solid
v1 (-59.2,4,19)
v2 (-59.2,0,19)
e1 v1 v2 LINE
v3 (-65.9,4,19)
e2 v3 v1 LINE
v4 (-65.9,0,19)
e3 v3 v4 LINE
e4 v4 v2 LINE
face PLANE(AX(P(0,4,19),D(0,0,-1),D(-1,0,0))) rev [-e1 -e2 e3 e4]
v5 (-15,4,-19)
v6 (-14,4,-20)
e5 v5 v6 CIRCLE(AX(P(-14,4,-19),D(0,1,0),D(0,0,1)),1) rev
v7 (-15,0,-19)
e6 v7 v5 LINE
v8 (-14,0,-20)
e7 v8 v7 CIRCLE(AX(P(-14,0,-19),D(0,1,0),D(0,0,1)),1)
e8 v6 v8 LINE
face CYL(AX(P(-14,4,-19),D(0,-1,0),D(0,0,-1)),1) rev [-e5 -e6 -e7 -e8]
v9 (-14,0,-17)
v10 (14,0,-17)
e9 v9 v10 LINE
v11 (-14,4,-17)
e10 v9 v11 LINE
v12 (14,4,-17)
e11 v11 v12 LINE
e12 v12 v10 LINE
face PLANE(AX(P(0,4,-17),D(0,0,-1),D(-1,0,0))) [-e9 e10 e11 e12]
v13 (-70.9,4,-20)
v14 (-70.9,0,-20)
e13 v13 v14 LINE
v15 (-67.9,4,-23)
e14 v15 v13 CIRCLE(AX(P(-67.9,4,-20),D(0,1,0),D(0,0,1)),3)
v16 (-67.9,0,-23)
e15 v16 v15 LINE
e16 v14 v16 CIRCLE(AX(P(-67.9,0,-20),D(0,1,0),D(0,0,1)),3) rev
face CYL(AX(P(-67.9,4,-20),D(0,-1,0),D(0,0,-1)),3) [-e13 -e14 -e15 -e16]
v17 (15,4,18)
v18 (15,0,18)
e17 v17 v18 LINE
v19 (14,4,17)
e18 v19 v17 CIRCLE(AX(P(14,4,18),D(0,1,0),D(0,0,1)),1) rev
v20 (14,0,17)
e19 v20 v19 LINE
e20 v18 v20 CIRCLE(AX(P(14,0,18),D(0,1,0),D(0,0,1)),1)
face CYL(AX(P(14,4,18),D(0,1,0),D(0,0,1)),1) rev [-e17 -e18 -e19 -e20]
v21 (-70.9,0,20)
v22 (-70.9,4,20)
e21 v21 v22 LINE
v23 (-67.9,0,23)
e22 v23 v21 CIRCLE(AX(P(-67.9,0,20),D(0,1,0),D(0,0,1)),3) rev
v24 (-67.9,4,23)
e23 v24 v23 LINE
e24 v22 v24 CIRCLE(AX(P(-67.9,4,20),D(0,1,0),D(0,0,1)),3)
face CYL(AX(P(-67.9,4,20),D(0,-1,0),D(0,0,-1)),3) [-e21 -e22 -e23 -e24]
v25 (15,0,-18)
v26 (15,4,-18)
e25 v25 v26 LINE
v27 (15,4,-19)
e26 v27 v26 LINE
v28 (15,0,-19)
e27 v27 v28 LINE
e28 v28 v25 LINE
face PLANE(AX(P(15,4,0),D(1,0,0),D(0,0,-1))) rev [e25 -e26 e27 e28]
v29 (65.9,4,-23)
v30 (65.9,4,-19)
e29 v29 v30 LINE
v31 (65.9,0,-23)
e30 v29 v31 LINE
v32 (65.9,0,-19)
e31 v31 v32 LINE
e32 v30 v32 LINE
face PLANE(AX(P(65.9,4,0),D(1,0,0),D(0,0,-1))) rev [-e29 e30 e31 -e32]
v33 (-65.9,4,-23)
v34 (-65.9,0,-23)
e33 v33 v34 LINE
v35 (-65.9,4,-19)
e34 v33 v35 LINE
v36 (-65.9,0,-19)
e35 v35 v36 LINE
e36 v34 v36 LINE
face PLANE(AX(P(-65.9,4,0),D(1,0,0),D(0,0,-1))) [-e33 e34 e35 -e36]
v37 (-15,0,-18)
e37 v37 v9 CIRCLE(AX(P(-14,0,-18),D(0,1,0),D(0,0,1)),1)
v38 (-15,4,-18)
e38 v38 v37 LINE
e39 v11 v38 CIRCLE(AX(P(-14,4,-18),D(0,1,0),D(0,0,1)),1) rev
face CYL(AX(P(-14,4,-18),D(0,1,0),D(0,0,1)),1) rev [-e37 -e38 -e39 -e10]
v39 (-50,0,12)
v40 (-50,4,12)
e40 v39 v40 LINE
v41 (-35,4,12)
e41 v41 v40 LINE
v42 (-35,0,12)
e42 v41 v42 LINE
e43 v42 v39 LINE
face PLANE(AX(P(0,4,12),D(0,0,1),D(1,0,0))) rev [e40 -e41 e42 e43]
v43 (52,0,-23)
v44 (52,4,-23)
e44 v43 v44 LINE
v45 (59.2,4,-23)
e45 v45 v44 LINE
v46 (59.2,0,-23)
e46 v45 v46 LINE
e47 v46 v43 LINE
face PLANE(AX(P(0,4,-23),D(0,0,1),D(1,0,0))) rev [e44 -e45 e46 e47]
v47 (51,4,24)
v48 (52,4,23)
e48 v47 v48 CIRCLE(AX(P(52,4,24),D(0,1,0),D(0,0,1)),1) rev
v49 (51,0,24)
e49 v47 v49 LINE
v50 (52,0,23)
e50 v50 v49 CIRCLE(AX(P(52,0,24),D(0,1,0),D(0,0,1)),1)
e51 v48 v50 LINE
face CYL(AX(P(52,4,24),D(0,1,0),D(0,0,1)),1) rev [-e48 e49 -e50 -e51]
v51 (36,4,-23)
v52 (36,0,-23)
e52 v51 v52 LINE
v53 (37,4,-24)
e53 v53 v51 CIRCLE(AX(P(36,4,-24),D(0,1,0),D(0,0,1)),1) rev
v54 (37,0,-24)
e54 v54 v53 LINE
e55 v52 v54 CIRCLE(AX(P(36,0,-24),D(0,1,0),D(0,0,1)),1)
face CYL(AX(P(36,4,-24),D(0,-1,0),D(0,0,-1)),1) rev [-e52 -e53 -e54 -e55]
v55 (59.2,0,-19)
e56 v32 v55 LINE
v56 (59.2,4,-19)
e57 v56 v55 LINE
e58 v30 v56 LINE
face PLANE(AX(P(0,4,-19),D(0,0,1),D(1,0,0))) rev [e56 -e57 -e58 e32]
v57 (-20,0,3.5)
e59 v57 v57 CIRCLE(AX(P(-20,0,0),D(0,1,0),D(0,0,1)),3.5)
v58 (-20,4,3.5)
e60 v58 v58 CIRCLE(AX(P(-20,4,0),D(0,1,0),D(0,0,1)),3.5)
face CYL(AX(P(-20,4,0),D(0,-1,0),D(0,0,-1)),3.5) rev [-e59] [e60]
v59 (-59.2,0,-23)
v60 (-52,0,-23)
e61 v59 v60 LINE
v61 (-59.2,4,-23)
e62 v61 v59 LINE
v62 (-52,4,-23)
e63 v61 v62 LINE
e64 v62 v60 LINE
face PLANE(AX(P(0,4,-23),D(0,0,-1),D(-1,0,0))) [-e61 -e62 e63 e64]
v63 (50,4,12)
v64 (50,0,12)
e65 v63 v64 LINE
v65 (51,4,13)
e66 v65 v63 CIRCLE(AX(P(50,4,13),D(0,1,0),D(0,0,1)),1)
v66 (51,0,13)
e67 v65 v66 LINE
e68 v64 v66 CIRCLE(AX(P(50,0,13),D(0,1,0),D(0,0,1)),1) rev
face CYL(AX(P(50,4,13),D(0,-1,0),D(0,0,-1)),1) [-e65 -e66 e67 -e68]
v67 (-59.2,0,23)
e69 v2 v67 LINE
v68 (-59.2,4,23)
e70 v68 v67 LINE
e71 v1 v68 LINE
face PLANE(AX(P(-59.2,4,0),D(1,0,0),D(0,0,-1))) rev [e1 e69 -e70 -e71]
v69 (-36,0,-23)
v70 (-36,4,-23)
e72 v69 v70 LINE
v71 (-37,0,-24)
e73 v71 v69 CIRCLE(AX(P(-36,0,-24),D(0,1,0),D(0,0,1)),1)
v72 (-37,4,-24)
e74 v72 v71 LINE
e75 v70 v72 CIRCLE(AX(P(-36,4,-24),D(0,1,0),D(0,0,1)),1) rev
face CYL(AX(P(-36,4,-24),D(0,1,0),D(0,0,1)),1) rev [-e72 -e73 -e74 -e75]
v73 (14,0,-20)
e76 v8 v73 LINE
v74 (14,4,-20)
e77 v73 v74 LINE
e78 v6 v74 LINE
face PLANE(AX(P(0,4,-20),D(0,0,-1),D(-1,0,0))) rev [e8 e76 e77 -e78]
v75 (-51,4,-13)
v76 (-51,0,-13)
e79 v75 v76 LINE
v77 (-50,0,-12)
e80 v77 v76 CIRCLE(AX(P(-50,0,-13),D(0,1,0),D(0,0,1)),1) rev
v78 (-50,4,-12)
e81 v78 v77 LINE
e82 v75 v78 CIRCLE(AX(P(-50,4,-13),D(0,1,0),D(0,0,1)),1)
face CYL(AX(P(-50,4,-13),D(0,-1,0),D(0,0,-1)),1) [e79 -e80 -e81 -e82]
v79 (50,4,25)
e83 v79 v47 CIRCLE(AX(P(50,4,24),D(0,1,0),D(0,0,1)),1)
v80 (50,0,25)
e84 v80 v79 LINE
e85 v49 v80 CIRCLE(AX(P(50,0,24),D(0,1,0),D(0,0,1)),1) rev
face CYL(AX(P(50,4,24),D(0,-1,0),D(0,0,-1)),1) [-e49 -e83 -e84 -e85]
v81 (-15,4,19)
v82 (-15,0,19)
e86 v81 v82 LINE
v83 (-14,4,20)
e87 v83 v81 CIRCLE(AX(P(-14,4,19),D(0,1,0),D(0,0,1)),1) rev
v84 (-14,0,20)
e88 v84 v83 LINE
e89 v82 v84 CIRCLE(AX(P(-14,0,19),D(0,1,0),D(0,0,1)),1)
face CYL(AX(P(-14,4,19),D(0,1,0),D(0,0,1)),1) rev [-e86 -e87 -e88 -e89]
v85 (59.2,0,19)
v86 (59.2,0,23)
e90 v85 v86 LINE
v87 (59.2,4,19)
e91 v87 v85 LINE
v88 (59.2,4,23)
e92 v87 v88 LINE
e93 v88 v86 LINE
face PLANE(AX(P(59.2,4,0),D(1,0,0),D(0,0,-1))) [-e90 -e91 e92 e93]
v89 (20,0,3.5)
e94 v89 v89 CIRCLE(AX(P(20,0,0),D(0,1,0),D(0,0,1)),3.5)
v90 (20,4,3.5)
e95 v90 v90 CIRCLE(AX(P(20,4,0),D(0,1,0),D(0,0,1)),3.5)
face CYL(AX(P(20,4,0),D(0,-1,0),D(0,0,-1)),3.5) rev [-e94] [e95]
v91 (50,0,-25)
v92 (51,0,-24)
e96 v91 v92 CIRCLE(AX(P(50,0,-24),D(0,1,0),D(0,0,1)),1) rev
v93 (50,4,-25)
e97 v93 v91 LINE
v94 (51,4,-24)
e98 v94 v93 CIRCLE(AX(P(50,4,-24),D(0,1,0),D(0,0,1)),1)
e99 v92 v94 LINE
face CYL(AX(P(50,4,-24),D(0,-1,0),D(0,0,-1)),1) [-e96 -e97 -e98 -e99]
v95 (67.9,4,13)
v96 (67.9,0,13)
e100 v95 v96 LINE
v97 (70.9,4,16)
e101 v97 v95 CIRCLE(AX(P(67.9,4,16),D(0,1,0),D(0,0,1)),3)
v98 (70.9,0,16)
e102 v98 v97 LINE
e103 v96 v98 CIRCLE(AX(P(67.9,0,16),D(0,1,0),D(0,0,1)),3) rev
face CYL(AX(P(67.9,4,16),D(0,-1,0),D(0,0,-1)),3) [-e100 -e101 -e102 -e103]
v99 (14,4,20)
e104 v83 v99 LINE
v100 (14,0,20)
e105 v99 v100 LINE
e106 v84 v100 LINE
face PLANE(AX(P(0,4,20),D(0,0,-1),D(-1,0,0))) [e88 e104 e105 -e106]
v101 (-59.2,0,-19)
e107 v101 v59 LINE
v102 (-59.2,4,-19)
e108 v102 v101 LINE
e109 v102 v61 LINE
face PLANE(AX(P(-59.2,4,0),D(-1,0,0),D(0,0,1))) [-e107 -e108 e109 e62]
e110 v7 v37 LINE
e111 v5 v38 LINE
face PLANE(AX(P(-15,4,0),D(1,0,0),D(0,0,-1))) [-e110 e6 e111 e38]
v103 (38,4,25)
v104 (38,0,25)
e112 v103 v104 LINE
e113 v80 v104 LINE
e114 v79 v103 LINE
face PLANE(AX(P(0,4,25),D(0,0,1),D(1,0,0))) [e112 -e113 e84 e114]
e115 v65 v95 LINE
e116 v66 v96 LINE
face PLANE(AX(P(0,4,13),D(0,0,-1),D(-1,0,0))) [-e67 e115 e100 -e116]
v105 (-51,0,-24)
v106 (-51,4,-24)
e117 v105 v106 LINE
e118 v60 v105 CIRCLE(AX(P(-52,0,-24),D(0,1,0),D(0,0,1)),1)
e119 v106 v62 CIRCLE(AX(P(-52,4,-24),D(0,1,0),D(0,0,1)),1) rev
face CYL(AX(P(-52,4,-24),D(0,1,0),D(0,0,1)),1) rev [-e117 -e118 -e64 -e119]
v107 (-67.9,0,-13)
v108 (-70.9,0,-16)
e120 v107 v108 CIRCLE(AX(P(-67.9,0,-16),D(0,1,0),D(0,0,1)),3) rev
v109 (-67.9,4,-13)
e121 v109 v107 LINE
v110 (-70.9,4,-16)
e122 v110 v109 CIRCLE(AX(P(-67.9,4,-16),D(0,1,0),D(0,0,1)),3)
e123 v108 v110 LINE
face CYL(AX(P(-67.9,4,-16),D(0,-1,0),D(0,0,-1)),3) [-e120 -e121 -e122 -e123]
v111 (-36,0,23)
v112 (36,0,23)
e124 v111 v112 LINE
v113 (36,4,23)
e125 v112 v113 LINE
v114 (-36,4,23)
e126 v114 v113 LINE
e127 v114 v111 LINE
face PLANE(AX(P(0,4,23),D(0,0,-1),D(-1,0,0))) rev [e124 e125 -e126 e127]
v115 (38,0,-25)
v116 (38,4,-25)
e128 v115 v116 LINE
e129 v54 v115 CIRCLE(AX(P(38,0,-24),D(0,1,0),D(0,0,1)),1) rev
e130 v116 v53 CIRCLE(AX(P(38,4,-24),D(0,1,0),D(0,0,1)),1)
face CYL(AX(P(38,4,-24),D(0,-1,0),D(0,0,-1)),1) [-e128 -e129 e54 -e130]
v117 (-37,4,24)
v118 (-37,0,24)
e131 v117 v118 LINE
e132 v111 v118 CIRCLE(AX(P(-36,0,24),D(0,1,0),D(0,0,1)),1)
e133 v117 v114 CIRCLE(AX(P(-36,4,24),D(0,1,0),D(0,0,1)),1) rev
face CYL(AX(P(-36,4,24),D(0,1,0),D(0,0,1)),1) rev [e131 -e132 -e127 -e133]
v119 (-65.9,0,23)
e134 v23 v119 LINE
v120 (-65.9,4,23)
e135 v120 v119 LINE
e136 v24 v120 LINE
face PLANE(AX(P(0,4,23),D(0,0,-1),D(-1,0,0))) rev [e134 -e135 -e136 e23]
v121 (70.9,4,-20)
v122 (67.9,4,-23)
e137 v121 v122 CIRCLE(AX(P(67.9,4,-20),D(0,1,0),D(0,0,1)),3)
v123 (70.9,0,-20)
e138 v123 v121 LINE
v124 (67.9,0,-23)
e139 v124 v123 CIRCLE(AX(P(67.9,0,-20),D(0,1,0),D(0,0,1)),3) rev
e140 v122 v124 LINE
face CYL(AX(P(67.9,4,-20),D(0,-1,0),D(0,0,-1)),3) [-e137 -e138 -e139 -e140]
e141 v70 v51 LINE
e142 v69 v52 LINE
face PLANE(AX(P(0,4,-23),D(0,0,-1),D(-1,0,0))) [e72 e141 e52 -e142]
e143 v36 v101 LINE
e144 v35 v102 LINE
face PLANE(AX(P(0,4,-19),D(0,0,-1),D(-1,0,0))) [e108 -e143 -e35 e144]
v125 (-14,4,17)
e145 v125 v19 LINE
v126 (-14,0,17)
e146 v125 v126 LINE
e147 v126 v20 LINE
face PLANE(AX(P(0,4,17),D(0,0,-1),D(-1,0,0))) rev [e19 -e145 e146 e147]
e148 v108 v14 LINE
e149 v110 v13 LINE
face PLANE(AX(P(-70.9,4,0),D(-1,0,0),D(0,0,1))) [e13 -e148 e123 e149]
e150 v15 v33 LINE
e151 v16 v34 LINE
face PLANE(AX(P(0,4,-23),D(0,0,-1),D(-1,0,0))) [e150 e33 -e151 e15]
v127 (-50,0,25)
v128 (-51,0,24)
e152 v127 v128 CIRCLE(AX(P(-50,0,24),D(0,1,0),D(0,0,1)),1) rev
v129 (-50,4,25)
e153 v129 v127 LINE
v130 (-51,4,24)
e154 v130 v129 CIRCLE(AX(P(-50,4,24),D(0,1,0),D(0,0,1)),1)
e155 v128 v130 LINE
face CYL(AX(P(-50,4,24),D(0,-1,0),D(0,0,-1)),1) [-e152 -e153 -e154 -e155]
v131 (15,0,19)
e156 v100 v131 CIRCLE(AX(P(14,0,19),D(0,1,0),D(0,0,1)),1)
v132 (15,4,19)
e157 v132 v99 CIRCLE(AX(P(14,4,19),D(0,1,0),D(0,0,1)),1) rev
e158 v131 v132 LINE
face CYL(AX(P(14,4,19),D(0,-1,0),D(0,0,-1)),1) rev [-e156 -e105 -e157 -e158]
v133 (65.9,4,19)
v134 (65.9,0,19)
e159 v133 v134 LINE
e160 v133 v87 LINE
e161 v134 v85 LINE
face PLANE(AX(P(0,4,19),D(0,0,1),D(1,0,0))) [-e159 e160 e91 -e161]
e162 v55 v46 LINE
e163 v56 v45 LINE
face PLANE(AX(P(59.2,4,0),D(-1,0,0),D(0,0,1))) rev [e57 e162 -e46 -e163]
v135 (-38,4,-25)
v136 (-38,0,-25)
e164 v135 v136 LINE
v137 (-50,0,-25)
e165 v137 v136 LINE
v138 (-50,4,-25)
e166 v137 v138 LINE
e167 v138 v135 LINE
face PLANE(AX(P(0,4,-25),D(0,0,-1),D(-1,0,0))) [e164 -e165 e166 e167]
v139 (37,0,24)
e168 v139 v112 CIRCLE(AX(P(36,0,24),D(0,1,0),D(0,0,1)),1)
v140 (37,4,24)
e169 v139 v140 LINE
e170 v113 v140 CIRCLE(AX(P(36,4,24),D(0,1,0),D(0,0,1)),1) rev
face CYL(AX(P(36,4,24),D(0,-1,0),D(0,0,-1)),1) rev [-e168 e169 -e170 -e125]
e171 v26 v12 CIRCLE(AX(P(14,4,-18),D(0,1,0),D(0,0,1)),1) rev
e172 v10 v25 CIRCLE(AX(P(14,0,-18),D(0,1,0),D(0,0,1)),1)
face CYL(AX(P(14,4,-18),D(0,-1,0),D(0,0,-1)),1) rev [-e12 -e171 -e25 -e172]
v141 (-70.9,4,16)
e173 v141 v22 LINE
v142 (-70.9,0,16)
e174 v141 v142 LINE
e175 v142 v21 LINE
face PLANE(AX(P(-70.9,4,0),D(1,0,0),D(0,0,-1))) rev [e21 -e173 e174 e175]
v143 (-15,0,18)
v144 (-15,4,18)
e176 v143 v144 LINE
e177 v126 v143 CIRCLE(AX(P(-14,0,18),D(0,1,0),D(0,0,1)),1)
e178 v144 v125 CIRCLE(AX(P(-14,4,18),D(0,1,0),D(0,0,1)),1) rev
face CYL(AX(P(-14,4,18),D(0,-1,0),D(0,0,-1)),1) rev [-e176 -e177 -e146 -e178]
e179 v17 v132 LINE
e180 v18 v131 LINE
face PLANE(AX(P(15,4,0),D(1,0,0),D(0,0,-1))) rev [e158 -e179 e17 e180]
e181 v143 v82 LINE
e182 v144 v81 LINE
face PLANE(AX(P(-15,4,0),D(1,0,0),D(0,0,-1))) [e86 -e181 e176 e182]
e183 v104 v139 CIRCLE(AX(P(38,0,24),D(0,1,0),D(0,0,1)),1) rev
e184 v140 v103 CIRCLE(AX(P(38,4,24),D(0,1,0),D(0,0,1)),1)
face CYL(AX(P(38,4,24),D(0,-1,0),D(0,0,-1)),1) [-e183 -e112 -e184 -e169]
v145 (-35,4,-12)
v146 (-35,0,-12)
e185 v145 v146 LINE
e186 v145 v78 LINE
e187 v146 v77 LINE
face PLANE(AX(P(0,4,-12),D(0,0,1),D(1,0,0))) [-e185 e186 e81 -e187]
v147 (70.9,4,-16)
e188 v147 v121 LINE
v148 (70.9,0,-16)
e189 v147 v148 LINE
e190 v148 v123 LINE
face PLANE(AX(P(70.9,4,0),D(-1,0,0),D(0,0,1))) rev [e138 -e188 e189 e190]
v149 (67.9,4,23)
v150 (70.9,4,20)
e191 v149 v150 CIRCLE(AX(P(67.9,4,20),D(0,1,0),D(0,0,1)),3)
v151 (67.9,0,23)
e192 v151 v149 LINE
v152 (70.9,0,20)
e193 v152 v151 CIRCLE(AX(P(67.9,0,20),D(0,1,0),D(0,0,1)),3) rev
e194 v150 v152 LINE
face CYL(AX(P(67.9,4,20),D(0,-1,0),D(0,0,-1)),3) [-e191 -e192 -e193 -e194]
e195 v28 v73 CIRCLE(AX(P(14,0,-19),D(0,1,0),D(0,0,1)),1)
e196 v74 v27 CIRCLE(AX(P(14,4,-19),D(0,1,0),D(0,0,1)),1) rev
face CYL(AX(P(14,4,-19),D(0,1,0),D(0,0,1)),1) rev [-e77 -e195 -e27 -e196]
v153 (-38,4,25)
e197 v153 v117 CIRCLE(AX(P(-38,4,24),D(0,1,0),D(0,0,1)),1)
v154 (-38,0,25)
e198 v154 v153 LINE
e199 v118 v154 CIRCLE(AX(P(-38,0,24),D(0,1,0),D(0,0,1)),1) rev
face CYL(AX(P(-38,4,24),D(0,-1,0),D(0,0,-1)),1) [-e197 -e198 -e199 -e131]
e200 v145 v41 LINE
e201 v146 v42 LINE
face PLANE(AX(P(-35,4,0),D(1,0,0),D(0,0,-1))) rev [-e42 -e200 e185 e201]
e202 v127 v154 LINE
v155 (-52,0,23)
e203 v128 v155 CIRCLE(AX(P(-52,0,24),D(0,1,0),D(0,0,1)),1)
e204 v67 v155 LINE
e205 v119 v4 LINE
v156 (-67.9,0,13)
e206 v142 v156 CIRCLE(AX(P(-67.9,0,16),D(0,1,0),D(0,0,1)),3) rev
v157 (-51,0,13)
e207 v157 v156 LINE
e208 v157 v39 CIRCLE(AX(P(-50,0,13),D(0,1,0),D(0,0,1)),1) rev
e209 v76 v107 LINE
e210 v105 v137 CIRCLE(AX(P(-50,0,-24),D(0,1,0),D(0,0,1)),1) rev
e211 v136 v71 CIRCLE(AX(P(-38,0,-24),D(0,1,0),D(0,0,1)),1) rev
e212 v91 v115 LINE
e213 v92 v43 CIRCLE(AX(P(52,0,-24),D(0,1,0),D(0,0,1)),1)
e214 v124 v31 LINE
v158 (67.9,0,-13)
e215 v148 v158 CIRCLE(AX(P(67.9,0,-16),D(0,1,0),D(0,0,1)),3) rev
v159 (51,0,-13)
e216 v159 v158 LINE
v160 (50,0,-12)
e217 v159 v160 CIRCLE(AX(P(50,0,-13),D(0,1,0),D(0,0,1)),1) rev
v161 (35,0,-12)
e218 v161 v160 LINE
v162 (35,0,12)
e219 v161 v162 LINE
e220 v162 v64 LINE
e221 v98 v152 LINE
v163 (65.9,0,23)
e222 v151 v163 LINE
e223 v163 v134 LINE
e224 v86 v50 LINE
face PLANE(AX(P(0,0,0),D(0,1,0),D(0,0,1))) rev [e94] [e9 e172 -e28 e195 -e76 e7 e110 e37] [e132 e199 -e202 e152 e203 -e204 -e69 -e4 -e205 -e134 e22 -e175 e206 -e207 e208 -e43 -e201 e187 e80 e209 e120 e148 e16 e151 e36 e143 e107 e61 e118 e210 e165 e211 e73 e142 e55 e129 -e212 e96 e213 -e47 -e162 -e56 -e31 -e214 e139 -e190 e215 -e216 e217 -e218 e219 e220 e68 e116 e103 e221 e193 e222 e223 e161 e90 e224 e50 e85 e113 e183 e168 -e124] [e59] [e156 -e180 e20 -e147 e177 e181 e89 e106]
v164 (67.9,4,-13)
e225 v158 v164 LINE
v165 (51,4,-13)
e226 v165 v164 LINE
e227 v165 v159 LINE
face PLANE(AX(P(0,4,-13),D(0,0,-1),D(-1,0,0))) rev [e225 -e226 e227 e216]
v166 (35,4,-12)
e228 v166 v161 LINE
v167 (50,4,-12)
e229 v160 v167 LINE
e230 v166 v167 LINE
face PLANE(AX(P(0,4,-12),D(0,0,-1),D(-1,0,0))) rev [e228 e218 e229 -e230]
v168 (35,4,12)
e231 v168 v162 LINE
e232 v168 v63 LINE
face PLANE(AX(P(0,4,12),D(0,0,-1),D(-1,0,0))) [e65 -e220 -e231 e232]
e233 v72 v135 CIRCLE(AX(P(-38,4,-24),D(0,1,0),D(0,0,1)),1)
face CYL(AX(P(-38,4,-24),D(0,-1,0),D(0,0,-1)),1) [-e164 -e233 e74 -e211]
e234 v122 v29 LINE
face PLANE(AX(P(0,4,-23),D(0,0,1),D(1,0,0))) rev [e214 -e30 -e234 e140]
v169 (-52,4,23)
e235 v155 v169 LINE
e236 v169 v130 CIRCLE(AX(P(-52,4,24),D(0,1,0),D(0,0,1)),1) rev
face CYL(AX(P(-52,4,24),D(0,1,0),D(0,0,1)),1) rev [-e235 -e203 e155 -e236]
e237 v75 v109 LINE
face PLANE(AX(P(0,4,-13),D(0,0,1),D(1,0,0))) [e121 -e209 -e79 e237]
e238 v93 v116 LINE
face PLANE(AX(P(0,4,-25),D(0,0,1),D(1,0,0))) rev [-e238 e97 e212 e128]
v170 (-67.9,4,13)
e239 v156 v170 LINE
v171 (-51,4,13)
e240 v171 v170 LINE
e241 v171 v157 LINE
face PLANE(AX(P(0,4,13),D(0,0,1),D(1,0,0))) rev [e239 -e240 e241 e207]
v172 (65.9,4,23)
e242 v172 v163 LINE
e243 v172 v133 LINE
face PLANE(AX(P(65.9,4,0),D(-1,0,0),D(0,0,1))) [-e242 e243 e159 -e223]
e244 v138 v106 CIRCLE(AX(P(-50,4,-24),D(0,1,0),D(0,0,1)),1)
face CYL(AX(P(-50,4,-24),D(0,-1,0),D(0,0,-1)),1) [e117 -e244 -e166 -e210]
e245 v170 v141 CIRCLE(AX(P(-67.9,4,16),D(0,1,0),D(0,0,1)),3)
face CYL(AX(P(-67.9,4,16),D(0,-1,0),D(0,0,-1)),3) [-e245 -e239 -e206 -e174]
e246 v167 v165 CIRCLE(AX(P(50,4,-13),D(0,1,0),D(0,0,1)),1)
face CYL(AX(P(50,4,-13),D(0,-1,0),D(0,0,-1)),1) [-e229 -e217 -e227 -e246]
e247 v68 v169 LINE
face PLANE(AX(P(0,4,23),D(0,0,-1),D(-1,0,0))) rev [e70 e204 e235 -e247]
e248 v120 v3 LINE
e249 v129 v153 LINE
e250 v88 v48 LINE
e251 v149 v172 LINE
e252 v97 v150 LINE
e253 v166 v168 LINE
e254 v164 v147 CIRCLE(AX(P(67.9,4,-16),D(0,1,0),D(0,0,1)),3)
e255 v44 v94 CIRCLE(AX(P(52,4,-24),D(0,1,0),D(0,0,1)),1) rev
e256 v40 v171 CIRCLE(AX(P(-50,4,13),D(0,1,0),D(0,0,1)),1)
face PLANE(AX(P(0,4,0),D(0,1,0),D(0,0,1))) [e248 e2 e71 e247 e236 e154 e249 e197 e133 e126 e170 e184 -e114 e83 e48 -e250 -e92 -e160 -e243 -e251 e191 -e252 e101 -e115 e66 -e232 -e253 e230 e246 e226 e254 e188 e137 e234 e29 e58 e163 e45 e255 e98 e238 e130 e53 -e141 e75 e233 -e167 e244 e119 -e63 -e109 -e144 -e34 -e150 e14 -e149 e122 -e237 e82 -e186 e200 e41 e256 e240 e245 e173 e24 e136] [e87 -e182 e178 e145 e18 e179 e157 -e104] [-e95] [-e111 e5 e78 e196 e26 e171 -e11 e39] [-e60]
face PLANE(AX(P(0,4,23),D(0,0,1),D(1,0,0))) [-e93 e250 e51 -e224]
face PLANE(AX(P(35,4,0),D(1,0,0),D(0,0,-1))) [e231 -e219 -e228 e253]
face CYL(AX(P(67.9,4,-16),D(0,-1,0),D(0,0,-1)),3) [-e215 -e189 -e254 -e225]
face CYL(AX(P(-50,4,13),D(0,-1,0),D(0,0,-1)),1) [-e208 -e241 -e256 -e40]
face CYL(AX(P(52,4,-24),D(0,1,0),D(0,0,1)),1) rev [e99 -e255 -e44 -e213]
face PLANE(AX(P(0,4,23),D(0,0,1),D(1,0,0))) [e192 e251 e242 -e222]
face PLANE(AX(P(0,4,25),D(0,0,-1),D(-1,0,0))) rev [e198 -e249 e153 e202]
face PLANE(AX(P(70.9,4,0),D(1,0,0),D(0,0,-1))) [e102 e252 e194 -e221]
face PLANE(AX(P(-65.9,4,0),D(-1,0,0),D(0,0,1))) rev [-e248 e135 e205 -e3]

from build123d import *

# Parameters (mm, degrees)
SCHIZZO1_W                   = 30
SCHIZZO1_H                   = 3
SCHIZZO1_R                   = 3.5
ESTRUSIONE_ESTRUSIONE1_DEPTH = 4
RACCORDO1_START              = -1
RACCORDO1_DEPTH              = 6
RACCORDO1_2_DEPTH            = 4
RACCORDO2_R                  = 3
RACCORDO3_R                  = 1
RACCORDO4_R                  = 1


with BuildPart() as part:
    # Schizzo1 → Estrusione-Estrusione1 (new body)
    with BuildSketch(Plane(origin=(0, 0, 0), x_dir=(1, 0, 0), z_dir=(0, 1, 0))):
        Polygon((-65.9, 19), (-65.9, 23), (-70.9, 23), (-70.9, 13), (-51, 13), (-51, 12), (-35, 12), (-35, -12), (-51, -12), (-51, -13), (-70.9, -13), (-70.9, -23), (-65.9, -23), (-65.9, -19), (-59.2, -19), (-59.2, -23), (-51, -23), (-51, -25), (-37, -25), (-37, -23), (37, -23), (37, -25), (51, -25), (51, -23), (59.2, -23), (59.2, -19), (65.9, -19), (65.9, -23), (70.9, -23), (70.9, -13), (51, -13), (51, -12), (35, -12), (35, 12), (51, 12), (51, 13), (70.9, 13), (70.9, 23), (65.9, 23), (65.9, 19), (59.2, 19), (59.2, 23), (51, 23), (51, 25), (37, 25), (37, 23), (-37, 23), (-37, 25), (-51, 25), (-51, 23), (-59.2, 23), (-59.2, 19), align=None)
        with Locations((0, -18.5)):
            Rectangle(SCHIZZO1_W, SCHIZZO1_H, mode=Mode.SUBTRACT)
        with Locations(Location((20, 0, 0), (0, 0, 270))):
            Circle(SCHIZZO1_R, mode=Mode.SUBTRACT)
        with Locations((0, 18.5)):
            Rectangle(SCHIZZO1_W, SCHIZZO1_H, mode=Mode.SUBTRACT)
        with Locations(Location((-20, 0, 0), (0, 0, 270))):
            Circle(SCHIZZO1_R, mode=Mode.SUBTRACT)
    extrude(amount=ESTRUSIONE_ESTRUSIONE1_DEPTH)

    # Raccordo1: read off the stored shape, not the designer's step
    # Raccordo1 outline → Raccordo1 (cut)
    with BuildSketch(Plane(origin=(0, 0, 0), x_dir=(1, 0, 0), z_dir=(0, 1, 0)).offset(RACCORDO1_START)):
        with BuildLine():
            Line((51, -25), (51, -24))
            ThreePointArc((51, -24), (50.707106781, -24.707106781), (50, -25))
            Line((50, -25), (51, -25))
        make_face()
        with BuildLine():
            Line((-51, -25), (-50, -25))
            ThreePointArc((-50, -25), (-50.707106781, -24.707106781), (-51, -24))
            Line((-51, -24), (-51, -25))
        make_face()
        with BuildLine():
            Line((-37, -25), (-37, -24))
            ThreePointArc((-37, -24), (-37.292893219, -24.707106781), (-38, -25))
            Line((-38, -25), (-37, -25))
        make_face()
        with BuildLine():
            Line((37, -25), (38, -25))
            ThreePointArc((38, -25), (37.292893219, -24.707106781), (37, -24))
            Line((37, -24), (37, -25))
        make_face()
        with BuildLine():
            Line((37, 25), (37, 24))
            ThreePointArc((37, 24), (37.292893219, 24.707106781), (38, 25))
            Line((38, 25), (37, 25))
        make_face()
        with BuildLine():
            ThreePointArc((-51, 24), (-50.707106781, 24.707106781), (-50, 25))
            Line((-50, 25), (-51, 25))
            Line((-51, 25), (-51, 24))
        make_face()
        with BuildLine():
            ThreePointArc((-38, 25), (-37.292893219, 24.707106781), (-37, 24))
            Line((-37, 24), (-37, 25))
            Line((-37, 25), (-38, 25))
        make_face()
        with BuildLine():
            Line((51, 25), (50, 25))
            ThreePointArc((50, 25), (50.707106781, 24.707106781), (51, 24))
            Line((51, 24), (51, 25))
        make_face()
    extrude(amount=RACCORDO1_DEPTH, mode=Mode.SUBTRACT)

    # Raccordo1 2 outline → Raccordo1 2 (add)
    with BuildSketch(Plane(origin=(0, 0, 0), x_dir=(1, 0, 0), z_dir=(0, 1, 0))):
        with BuildLine():
            Line((51, -23), (51, -24))
            ThreePointArc((51, -24), (51.292893219, -23.292893219), (52, -23))
            Line((52, -23), (51, -23))
        make_face()
        with BuildLine():
            ThreePointArc((-52, -23), (-51.292893219, -23.292893219), (-51, -24))
            Line((-51, -24), (-51, -23))
            Line((-51, -23), (-52, -23))
        make_face()
        with BuildLine():
            ThreePointArc((-37, -24), (-36.707106781, -23.292893219), (-36, -23))
            Line((-36, -23), (-37, -23))
            Line((-37, -23), (-37, -24))
        make_face()
        with BuildLine():
            ThreePointArc((36, -23), (36.707106781, -23.292893219), (37, -24))
            Line((37, -24), (37, -23))
            Line((37, -23), (36, -23))
        make_face()
        with BuildLine():
            Line((37, 23), (37, 24))
            ThreePointArc((37, 24), (36.707106781, 23.292893219), (36, 23))
            Line((36, 23), (37, 23))
        make_face()
        with BuildLine():
            Line((-51, 23), (-51, 24))
            ThreePointArc((-51, 24), (-51.292893219, 23.292893219), (-52, 23))
            Line((-52, 23), (-51, 23))
        make_face()
        with BuildLine():
            Line((-37, 23), (-36, 23))
            ThreePointArc((-36, 23), (-36.707106781, 23.292893219), (-37, 24))
            Line((-37, 24), (-37, 23))
        make_face()
        with BuildLine():
            ThreePointArc((52, 23), (51.292893219, 23.292893219), (51, 24))
            Line((51, 24), (51, 23))
            Line((51, 23), (52, 23))
        make_face()
    extrude(amount=RACCORDO1_2_DEPTH)

    # Raccordo2
    raccordo2_edges = [part.edges().sort_by_distance(p)[0] for p in [
        (70.9, 2, 13),
        (70.9, 2, 23),
        (-70.9, 2, 23),
        (-70.9, 2, 13),
        (-70.9, 2, -13),
        (-70.9, 2, -23),
        (70.9, 2, -23),
        (70.9, 2, -13),
    ]]
    fillet(raccordo2_edges, radius=RACCORDO2_R)

    # Raccordo3
    raccordo3_edges = [part.edges().sort_by_distance(p)[0] for p in [
        (51, 2, -12),
        (51, 2, 12),
        (-51, 2, 12),
        (-51, 2, -12),
    ]]
    fillet(raccordo3_edges, radius=RACCORDO3_R - 0.0001)  # a hair under: the kernel refuses the full size

    # Raccordo4
    raccordo4_edges = [part.edges().sort_by_distance(p)[0] for p in [
        (15, 2, 17),
        (-15, 2, 17),
        (-15, 2, 20),
        (15, 2, 20),
        (15, 2, -20),
        (-15, 2, -20),
        (-15, 2, -17),
        (15, 2, -17),
    ]]
    fillet(raccordo4_edges, radius=RACCORDO4_R)


solid = part.part
